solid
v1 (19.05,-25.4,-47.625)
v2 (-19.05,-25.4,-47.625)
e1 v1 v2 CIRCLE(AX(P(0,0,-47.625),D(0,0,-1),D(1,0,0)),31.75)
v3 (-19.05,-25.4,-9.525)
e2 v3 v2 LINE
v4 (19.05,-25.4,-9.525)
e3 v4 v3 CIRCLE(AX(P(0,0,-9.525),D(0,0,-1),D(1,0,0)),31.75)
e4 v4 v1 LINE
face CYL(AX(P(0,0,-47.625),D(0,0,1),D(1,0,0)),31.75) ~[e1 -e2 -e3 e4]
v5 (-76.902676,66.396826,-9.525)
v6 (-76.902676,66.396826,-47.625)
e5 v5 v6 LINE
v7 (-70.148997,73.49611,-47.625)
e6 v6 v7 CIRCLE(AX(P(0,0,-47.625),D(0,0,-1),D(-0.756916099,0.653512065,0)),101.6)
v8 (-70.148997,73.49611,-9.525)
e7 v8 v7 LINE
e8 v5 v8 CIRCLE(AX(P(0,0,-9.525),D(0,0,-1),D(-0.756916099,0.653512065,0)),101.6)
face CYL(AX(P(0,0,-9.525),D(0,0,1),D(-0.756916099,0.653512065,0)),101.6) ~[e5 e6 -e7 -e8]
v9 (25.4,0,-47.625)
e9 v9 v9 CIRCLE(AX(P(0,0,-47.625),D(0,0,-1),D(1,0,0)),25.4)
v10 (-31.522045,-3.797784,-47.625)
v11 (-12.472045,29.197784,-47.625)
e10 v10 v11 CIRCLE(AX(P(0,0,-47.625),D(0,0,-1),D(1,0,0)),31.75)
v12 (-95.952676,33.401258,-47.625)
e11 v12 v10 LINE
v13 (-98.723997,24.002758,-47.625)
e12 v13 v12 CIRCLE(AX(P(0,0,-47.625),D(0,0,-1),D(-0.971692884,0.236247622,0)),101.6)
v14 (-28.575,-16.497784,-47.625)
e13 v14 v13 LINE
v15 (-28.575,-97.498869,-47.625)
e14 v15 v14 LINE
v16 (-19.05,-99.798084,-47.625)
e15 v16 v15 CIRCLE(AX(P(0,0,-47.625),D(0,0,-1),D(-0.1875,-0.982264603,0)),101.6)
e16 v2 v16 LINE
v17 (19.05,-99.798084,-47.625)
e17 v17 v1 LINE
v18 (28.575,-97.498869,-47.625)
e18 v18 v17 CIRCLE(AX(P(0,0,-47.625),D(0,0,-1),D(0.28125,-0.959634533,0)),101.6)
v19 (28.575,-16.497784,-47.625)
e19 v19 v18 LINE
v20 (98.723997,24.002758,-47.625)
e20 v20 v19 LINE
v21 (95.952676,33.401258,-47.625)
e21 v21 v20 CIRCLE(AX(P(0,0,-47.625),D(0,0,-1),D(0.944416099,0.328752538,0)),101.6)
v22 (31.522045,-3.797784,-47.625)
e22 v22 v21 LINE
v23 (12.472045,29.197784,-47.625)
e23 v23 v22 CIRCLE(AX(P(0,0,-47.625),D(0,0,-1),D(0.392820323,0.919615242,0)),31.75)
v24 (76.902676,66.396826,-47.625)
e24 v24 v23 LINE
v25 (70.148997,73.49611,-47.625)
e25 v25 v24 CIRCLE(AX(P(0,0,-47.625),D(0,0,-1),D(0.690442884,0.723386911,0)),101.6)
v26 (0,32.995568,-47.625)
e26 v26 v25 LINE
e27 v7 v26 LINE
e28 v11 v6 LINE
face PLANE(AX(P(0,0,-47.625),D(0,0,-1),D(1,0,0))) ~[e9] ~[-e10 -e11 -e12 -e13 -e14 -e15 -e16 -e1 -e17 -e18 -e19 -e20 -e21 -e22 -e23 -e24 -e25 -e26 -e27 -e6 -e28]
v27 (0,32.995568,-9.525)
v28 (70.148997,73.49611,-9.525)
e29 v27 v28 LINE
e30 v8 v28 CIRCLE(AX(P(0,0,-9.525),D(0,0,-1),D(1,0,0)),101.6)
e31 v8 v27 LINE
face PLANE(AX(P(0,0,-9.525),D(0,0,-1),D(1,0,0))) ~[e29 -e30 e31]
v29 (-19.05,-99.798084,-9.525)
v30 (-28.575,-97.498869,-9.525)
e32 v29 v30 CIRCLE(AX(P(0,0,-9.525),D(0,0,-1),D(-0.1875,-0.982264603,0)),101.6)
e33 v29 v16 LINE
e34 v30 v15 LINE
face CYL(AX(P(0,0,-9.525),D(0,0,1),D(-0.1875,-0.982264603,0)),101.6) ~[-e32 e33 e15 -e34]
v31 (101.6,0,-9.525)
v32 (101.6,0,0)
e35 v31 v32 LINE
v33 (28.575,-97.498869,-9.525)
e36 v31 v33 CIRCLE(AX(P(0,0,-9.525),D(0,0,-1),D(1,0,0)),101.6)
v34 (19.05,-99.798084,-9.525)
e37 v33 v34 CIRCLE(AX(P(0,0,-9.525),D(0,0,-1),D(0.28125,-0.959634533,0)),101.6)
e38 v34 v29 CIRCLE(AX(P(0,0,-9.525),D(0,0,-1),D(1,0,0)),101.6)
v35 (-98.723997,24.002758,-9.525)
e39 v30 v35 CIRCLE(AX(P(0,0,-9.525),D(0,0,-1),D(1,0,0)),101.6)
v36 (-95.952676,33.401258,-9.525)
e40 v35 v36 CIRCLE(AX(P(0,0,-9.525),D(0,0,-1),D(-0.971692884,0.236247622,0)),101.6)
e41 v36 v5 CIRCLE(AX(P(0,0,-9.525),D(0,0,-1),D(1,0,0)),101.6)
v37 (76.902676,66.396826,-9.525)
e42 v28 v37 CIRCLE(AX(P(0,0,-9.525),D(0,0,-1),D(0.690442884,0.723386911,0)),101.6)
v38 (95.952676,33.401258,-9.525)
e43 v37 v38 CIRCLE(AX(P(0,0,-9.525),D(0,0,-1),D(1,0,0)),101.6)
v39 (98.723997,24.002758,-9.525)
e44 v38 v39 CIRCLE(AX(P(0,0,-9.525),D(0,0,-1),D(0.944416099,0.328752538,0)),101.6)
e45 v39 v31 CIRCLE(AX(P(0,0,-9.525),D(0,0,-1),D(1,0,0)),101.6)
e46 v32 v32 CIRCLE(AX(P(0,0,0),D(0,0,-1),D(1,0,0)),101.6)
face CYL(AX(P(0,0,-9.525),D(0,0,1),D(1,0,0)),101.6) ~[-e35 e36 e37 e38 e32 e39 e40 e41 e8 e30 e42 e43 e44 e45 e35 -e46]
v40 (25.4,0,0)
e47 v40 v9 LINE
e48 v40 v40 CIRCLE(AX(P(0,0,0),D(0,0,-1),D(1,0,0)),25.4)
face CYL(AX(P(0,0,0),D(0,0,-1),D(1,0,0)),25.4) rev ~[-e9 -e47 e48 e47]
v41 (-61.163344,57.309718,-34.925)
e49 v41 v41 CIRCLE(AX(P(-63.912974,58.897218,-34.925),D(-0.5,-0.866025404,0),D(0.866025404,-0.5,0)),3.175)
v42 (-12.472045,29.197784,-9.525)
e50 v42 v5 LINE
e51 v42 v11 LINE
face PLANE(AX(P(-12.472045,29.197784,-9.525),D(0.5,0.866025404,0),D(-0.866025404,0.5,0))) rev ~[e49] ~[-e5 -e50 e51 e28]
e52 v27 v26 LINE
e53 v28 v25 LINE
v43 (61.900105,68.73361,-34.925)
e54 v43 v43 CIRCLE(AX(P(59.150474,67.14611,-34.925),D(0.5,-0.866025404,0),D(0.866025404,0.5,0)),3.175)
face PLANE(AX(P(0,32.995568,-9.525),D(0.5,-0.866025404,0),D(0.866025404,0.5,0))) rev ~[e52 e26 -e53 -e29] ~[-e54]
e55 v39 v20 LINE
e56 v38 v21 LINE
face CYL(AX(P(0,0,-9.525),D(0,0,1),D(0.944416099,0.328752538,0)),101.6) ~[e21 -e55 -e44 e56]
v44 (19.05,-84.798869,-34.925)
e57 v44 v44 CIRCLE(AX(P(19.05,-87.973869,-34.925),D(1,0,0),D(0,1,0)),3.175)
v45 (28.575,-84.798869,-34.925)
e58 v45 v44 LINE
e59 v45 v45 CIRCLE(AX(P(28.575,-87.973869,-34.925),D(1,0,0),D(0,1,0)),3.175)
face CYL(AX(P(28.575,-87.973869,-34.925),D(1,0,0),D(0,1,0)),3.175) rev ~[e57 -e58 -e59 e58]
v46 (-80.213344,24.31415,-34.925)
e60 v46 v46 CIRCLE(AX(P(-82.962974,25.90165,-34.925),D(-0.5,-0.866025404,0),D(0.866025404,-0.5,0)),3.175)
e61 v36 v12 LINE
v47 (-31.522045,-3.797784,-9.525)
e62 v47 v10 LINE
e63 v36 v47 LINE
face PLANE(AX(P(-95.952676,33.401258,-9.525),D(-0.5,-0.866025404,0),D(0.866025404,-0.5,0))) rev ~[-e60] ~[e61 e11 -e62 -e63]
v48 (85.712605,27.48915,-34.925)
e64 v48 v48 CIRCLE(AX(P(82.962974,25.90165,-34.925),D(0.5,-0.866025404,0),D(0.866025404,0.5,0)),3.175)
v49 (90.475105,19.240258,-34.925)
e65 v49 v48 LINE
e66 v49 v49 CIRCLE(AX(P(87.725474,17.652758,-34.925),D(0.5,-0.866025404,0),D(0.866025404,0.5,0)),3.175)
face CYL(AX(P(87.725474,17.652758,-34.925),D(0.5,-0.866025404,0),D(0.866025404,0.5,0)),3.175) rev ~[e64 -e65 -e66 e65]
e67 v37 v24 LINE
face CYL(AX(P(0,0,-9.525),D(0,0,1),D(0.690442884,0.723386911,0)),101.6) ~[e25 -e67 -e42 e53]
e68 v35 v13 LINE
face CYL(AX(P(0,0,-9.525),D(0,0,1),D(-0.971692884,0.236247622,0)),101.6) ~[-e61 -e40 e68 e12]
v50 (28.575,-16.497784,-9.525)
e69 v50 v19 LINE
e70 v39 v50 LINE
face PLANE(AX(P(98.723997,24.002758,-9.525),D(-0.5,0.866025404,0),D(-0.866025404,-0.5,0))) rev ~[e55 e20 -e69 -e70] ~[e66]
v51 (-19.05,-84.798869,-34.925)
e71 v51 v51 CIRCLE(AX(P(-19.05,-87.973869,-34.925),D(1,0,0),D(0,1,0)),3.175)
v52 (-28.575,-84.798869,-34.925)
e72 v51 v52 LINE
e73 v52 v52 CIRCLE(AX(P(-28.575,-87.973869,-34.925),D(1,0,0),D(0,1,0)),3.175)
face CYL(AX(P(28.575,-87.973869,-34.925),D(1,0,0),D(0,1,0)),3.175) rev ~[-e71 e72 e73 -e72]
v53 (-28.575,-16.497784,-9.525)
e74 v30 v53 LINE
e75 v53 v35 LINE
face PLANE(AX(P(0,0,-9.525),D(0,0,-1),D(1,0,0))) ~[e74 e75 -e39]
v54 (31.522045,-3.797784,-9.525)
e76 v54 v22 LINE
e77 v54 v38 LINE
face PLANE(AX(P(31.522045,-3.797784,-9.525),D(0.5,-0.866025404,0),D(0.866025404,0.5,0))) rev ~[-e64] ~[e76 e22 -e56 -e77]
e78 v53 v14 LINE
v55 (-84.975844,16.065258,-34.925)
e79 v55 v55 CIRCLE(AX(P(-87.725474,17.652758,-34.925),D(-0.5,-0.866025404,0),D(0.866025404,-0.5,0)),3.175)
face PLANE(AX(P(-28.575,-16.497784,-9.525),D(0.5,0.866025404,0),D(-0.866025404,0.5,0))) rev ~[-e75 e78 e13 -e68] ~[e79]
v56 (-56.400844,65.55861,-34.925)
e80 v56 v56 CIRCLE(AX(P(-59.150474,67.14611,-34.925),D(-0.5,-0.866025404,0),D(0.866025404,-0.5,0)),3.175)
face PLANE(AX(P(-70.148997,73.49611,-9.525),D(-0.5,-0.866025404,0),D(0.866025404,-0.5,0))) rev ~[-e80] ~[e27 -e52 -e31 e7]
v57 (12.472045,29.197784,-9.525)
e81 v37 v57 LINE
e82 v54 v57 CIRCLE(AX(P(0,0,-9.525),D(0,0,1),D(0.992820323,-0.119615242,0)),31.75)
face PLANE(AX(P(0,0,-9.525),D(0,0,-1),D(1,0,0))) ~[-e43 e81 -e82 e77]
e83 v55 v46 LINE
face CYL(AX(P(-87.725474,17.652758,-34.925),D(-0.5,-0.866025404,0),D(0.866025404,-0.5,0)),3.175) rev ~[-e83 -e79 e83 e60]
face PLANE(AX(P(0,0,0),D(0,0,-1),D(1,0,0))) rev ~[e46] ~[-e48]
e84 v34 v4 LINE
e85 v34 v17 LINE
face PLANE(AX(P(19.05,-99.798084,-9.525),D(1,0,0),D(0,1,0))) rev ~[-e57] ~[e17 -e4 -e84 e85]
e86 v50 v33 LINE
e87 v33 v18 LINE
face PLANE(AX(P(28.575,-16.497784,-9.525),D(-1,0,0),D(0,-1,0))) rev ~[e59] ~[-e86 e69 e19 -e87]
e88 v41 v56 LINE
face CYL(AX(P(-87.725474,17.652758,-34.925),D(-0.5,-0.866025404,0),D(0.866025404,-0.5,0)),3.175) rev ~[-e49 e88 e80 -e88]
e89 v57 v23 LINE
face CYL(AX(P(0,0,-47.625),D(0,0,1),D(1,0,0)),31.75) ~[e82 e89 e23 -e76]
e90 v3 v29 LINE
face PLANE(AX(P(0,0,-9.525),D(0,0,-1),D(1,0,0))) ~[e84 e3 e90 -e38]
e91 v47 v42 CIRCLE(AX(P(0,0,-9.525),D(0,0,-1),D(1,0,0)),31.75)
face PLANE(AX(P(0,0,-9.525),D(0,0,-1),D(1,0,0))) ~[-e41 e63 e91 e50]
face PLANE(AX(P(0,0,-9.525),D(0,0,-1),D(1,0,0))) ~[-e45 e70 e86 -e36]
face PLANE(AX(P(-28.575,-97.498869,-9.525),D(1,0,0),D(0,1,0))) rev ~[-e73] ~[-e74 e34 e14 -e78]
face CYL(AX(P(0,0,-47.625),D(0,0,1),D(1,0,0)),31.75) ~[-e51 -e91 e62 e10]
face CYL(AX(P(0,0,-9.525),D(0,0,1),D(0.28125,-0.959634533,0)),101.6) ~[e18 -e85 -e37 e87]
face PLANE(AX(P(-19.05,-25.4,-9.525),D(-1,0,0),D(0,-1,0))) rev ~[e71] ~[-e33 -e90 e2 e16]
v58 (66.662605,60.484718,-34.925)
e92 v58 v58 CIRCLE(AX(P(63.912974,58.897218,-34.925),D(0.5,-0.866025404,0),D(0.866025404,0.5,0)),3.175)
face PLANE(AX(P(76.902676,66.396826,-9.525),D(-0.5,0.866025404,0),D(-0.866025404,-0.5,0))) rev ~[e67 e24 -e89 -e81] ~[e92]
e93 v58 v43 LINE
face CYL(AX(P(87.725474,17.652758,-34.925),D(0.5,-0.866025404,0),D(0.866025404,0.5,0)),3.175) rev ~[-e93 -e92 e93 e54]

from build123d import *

# Parameters (mm, degrees)
F3_DEPTH = 38.1
F4_R     = 3.175
F5_DEPTH = 76.2
F6_R     = 3.175
F7_DEPTH = 76.2
F8_R     = 3.175
F9_DEPTH = 76.2


with BuildPart() as f1:
    # F0 (on Front) → F1 (revolve)
    with BuildSketch(Plane.XZ):
        Polygon((101.6, 0), (25.4, 0), (25.4, -47.625), (31.75, -47.625), (31.75, -9.525), (101.6, -9.525), align=None)
    revolve(axis=Axis((0, 0, -4.0980735794), (0, 0, -1)))

    # F2 (on face) → F3 (join)
    with BuildSketch(Plane(origin=(0, 0, -9.525), x_dir=(1, 0, 0), z_dir=(0, 0, -1))):
        with BuildLine():
            Line((-28.575, 13.8395041457), (-28.575, 16.4977839421))
            Line((-28.575, 16.4977839421), (-98.7239970333, -24.0027583784))
            ThreePointArc((-98.7239970333, -24.0027583784), (-97.4517043144, -28.7354367675), (-95.952675689, -33.4012578824))
            Line((-95.952675689, -33.4012578824), (-31.5220452561, 3.7977839421))
            ThreePointArc((-31.5220452561, 3.7977839421), (-30.4651070619, 8.9409032938), (-28.575, 13.8395041457))
        make_face()
        with BuildLine():
            Line((-12.4720452561, -29.1977839421), (-76.902675689, -66.3968257666))
            ThreePointArc((-76.902675689, -66.3968257666), (-73.6114703867, -70.0279331946), (-70.1489970333, -73.4961102047))
            Line((-70.1489970333, -73.4961102047), (0, -32.9955678842))
            Line((0, -32.9955678842), (-2.302137834, -31.666427986))
            ThreePointArc((-2.302137834, -31.666427986), (-7.4895041457, -30.8540082915), (-12.4720452561, -29.1977839421))
        make_face()
        with BuildLine():
            ThreePointArc((2.302137834, -31.666427986), (0, -31.75), (-2.302137834, -31.666427986))
            Line((-2.302137834, -31.666427986), (0, -32.9955678842))
            Line((0, -32.9955678842), (2.302137834, -31.666427986))
        make_face()
        with BuildLine():
            ThreePointArc((70.1489970333, -73.4961102047), (73.6114703867, -70.0279331946), (76.902675689, -66.3968257666))
            Line((76.902675689, -66.3968257666), (12.4720452561, -29.1977839421))
            ThreePointArc((12.4720452561, -29.1977839421), (7.4895041457, -30.8540082915), (2.302137834, -31.666427986))
            Line((2.302137834, -31.666427986), (0, -32.9955678842))
            Line((0, -32.9955678842), (70.1489970333, -73.4961102047))
        make_face()
        with BuildLine():
            Line((98.7239970333, -24.0027583784), (28.575, 16.4977839421))
            Line((28.575, 16.4977839421), (28.575, 13.8395041457))
            ThreePointArc((28.575, 13.8395041457), (30.4651070619, 8.9409032938), (31.5220452561, 3.7977839421))
            Line((31.5220452561, 3.7977839421), (95.952675689, -33.4012578824))
            ThreePointArc((95.952675689, -33.4012578824), (97.4517043144, -28.7354367675), (98.7239970333, -24.0027583784))
        make_face()
        with BuildLine():
            ThreePointArc((-28.575, 13.8395041457), (-27.4963065702, 15.875), (-26.272862166, 17.8269238403))
            Line((-26.272862166, 17.8269238403), (-28.575, 16.4977839421))
            Line((-28.575, 16.4977839421), (-28.575, 13.8395041457))
        make_face()
        with BuildLine():
            Line((-19.05, 25.4), (-19.05, 99.7980836489))
            ThreePointArc((-19.05, 99.7980836489), (-23.8402339277, 98.7633699621), (-28.575, 97.4988685832))
            Line((-28.575, 97.4988685832), (-28.575, 16.4977839421))
            Line((-28.575, 16.4977839421), (-26.272862166, 17.8269238403))
            ThreePointArc((-26.272862166, 17.8269238403), (-22.9756029161, 21.9131049977), (-19.05, 25.4))
        make_face()
        with BuildLine():
            Line((28.575, 16.4977839421), (26.272862166, 17.8269238403))
            ThreePointArc((26.272862166, 17.8269238403), (27.4963065702, 15.875), (28.575, 13.8395041457))
            Line((28.575, 13.8395041457), (28.575, 16.4977839421))
        make_face()
        with BuildLine():
            ThreePointArc((28.575, 97.4988685832), (23.8402339277, 98.7633699621), (19.05, 99.7980836489))
            Line((19.05, 99.7980836489), (19.05, 25.4))
            ThreePointArc((19.05, 25.4), (22.9756029161, 21.9131049977), (26.272862166, 17.8269238403))
            Line((26.272862166, 17.8269238403), (28.575, 16.4977839421))
            Line((28.575, 16.4977839421), (28.575, 97.4988685832))
        make_face()
    extrude(amount=F3_DEPTH)

    # F4 (on face) → F5 (cut)
    with BuildSketch(Plane.YZ.offset(28.575)):
        with Locations((-87.9738685832, -34.925)):
            Circle(F4_R)
    extrude(amount=-F5_DEPTH, mode=Mode.SUBTRACT)

    # F6 (on face) → F7 (cut)
    with BuildSketch(Plane(origin=(14.2875, -24.7466759131, 0), x_dir=(0.8660254038, 0.5, 0), z_dir=(0.5, -0.8660254038, 0))):
        with Locations((84.7988685832, -34.925)):
            Circle(F6_R)
    extrude(amount=-F7_DEPTH, mode=Mode.SUBTRACT)

    # F8 (on face) → F9 (cut)
    with BuildSketch(Plane(origin=(-14.2875, -24.7466759131, 0), x_dir=(0.8660254038, -0.5, 0), z_dir=(-0.5, -0.8660254038, 0))):
        with Locations((-84.7988685832, -34.925)):
            Circle(F8_R)
    extrude(amount=-F9_DEPTH, mode=Mode.SUBTRACT)


solid = f1.part
